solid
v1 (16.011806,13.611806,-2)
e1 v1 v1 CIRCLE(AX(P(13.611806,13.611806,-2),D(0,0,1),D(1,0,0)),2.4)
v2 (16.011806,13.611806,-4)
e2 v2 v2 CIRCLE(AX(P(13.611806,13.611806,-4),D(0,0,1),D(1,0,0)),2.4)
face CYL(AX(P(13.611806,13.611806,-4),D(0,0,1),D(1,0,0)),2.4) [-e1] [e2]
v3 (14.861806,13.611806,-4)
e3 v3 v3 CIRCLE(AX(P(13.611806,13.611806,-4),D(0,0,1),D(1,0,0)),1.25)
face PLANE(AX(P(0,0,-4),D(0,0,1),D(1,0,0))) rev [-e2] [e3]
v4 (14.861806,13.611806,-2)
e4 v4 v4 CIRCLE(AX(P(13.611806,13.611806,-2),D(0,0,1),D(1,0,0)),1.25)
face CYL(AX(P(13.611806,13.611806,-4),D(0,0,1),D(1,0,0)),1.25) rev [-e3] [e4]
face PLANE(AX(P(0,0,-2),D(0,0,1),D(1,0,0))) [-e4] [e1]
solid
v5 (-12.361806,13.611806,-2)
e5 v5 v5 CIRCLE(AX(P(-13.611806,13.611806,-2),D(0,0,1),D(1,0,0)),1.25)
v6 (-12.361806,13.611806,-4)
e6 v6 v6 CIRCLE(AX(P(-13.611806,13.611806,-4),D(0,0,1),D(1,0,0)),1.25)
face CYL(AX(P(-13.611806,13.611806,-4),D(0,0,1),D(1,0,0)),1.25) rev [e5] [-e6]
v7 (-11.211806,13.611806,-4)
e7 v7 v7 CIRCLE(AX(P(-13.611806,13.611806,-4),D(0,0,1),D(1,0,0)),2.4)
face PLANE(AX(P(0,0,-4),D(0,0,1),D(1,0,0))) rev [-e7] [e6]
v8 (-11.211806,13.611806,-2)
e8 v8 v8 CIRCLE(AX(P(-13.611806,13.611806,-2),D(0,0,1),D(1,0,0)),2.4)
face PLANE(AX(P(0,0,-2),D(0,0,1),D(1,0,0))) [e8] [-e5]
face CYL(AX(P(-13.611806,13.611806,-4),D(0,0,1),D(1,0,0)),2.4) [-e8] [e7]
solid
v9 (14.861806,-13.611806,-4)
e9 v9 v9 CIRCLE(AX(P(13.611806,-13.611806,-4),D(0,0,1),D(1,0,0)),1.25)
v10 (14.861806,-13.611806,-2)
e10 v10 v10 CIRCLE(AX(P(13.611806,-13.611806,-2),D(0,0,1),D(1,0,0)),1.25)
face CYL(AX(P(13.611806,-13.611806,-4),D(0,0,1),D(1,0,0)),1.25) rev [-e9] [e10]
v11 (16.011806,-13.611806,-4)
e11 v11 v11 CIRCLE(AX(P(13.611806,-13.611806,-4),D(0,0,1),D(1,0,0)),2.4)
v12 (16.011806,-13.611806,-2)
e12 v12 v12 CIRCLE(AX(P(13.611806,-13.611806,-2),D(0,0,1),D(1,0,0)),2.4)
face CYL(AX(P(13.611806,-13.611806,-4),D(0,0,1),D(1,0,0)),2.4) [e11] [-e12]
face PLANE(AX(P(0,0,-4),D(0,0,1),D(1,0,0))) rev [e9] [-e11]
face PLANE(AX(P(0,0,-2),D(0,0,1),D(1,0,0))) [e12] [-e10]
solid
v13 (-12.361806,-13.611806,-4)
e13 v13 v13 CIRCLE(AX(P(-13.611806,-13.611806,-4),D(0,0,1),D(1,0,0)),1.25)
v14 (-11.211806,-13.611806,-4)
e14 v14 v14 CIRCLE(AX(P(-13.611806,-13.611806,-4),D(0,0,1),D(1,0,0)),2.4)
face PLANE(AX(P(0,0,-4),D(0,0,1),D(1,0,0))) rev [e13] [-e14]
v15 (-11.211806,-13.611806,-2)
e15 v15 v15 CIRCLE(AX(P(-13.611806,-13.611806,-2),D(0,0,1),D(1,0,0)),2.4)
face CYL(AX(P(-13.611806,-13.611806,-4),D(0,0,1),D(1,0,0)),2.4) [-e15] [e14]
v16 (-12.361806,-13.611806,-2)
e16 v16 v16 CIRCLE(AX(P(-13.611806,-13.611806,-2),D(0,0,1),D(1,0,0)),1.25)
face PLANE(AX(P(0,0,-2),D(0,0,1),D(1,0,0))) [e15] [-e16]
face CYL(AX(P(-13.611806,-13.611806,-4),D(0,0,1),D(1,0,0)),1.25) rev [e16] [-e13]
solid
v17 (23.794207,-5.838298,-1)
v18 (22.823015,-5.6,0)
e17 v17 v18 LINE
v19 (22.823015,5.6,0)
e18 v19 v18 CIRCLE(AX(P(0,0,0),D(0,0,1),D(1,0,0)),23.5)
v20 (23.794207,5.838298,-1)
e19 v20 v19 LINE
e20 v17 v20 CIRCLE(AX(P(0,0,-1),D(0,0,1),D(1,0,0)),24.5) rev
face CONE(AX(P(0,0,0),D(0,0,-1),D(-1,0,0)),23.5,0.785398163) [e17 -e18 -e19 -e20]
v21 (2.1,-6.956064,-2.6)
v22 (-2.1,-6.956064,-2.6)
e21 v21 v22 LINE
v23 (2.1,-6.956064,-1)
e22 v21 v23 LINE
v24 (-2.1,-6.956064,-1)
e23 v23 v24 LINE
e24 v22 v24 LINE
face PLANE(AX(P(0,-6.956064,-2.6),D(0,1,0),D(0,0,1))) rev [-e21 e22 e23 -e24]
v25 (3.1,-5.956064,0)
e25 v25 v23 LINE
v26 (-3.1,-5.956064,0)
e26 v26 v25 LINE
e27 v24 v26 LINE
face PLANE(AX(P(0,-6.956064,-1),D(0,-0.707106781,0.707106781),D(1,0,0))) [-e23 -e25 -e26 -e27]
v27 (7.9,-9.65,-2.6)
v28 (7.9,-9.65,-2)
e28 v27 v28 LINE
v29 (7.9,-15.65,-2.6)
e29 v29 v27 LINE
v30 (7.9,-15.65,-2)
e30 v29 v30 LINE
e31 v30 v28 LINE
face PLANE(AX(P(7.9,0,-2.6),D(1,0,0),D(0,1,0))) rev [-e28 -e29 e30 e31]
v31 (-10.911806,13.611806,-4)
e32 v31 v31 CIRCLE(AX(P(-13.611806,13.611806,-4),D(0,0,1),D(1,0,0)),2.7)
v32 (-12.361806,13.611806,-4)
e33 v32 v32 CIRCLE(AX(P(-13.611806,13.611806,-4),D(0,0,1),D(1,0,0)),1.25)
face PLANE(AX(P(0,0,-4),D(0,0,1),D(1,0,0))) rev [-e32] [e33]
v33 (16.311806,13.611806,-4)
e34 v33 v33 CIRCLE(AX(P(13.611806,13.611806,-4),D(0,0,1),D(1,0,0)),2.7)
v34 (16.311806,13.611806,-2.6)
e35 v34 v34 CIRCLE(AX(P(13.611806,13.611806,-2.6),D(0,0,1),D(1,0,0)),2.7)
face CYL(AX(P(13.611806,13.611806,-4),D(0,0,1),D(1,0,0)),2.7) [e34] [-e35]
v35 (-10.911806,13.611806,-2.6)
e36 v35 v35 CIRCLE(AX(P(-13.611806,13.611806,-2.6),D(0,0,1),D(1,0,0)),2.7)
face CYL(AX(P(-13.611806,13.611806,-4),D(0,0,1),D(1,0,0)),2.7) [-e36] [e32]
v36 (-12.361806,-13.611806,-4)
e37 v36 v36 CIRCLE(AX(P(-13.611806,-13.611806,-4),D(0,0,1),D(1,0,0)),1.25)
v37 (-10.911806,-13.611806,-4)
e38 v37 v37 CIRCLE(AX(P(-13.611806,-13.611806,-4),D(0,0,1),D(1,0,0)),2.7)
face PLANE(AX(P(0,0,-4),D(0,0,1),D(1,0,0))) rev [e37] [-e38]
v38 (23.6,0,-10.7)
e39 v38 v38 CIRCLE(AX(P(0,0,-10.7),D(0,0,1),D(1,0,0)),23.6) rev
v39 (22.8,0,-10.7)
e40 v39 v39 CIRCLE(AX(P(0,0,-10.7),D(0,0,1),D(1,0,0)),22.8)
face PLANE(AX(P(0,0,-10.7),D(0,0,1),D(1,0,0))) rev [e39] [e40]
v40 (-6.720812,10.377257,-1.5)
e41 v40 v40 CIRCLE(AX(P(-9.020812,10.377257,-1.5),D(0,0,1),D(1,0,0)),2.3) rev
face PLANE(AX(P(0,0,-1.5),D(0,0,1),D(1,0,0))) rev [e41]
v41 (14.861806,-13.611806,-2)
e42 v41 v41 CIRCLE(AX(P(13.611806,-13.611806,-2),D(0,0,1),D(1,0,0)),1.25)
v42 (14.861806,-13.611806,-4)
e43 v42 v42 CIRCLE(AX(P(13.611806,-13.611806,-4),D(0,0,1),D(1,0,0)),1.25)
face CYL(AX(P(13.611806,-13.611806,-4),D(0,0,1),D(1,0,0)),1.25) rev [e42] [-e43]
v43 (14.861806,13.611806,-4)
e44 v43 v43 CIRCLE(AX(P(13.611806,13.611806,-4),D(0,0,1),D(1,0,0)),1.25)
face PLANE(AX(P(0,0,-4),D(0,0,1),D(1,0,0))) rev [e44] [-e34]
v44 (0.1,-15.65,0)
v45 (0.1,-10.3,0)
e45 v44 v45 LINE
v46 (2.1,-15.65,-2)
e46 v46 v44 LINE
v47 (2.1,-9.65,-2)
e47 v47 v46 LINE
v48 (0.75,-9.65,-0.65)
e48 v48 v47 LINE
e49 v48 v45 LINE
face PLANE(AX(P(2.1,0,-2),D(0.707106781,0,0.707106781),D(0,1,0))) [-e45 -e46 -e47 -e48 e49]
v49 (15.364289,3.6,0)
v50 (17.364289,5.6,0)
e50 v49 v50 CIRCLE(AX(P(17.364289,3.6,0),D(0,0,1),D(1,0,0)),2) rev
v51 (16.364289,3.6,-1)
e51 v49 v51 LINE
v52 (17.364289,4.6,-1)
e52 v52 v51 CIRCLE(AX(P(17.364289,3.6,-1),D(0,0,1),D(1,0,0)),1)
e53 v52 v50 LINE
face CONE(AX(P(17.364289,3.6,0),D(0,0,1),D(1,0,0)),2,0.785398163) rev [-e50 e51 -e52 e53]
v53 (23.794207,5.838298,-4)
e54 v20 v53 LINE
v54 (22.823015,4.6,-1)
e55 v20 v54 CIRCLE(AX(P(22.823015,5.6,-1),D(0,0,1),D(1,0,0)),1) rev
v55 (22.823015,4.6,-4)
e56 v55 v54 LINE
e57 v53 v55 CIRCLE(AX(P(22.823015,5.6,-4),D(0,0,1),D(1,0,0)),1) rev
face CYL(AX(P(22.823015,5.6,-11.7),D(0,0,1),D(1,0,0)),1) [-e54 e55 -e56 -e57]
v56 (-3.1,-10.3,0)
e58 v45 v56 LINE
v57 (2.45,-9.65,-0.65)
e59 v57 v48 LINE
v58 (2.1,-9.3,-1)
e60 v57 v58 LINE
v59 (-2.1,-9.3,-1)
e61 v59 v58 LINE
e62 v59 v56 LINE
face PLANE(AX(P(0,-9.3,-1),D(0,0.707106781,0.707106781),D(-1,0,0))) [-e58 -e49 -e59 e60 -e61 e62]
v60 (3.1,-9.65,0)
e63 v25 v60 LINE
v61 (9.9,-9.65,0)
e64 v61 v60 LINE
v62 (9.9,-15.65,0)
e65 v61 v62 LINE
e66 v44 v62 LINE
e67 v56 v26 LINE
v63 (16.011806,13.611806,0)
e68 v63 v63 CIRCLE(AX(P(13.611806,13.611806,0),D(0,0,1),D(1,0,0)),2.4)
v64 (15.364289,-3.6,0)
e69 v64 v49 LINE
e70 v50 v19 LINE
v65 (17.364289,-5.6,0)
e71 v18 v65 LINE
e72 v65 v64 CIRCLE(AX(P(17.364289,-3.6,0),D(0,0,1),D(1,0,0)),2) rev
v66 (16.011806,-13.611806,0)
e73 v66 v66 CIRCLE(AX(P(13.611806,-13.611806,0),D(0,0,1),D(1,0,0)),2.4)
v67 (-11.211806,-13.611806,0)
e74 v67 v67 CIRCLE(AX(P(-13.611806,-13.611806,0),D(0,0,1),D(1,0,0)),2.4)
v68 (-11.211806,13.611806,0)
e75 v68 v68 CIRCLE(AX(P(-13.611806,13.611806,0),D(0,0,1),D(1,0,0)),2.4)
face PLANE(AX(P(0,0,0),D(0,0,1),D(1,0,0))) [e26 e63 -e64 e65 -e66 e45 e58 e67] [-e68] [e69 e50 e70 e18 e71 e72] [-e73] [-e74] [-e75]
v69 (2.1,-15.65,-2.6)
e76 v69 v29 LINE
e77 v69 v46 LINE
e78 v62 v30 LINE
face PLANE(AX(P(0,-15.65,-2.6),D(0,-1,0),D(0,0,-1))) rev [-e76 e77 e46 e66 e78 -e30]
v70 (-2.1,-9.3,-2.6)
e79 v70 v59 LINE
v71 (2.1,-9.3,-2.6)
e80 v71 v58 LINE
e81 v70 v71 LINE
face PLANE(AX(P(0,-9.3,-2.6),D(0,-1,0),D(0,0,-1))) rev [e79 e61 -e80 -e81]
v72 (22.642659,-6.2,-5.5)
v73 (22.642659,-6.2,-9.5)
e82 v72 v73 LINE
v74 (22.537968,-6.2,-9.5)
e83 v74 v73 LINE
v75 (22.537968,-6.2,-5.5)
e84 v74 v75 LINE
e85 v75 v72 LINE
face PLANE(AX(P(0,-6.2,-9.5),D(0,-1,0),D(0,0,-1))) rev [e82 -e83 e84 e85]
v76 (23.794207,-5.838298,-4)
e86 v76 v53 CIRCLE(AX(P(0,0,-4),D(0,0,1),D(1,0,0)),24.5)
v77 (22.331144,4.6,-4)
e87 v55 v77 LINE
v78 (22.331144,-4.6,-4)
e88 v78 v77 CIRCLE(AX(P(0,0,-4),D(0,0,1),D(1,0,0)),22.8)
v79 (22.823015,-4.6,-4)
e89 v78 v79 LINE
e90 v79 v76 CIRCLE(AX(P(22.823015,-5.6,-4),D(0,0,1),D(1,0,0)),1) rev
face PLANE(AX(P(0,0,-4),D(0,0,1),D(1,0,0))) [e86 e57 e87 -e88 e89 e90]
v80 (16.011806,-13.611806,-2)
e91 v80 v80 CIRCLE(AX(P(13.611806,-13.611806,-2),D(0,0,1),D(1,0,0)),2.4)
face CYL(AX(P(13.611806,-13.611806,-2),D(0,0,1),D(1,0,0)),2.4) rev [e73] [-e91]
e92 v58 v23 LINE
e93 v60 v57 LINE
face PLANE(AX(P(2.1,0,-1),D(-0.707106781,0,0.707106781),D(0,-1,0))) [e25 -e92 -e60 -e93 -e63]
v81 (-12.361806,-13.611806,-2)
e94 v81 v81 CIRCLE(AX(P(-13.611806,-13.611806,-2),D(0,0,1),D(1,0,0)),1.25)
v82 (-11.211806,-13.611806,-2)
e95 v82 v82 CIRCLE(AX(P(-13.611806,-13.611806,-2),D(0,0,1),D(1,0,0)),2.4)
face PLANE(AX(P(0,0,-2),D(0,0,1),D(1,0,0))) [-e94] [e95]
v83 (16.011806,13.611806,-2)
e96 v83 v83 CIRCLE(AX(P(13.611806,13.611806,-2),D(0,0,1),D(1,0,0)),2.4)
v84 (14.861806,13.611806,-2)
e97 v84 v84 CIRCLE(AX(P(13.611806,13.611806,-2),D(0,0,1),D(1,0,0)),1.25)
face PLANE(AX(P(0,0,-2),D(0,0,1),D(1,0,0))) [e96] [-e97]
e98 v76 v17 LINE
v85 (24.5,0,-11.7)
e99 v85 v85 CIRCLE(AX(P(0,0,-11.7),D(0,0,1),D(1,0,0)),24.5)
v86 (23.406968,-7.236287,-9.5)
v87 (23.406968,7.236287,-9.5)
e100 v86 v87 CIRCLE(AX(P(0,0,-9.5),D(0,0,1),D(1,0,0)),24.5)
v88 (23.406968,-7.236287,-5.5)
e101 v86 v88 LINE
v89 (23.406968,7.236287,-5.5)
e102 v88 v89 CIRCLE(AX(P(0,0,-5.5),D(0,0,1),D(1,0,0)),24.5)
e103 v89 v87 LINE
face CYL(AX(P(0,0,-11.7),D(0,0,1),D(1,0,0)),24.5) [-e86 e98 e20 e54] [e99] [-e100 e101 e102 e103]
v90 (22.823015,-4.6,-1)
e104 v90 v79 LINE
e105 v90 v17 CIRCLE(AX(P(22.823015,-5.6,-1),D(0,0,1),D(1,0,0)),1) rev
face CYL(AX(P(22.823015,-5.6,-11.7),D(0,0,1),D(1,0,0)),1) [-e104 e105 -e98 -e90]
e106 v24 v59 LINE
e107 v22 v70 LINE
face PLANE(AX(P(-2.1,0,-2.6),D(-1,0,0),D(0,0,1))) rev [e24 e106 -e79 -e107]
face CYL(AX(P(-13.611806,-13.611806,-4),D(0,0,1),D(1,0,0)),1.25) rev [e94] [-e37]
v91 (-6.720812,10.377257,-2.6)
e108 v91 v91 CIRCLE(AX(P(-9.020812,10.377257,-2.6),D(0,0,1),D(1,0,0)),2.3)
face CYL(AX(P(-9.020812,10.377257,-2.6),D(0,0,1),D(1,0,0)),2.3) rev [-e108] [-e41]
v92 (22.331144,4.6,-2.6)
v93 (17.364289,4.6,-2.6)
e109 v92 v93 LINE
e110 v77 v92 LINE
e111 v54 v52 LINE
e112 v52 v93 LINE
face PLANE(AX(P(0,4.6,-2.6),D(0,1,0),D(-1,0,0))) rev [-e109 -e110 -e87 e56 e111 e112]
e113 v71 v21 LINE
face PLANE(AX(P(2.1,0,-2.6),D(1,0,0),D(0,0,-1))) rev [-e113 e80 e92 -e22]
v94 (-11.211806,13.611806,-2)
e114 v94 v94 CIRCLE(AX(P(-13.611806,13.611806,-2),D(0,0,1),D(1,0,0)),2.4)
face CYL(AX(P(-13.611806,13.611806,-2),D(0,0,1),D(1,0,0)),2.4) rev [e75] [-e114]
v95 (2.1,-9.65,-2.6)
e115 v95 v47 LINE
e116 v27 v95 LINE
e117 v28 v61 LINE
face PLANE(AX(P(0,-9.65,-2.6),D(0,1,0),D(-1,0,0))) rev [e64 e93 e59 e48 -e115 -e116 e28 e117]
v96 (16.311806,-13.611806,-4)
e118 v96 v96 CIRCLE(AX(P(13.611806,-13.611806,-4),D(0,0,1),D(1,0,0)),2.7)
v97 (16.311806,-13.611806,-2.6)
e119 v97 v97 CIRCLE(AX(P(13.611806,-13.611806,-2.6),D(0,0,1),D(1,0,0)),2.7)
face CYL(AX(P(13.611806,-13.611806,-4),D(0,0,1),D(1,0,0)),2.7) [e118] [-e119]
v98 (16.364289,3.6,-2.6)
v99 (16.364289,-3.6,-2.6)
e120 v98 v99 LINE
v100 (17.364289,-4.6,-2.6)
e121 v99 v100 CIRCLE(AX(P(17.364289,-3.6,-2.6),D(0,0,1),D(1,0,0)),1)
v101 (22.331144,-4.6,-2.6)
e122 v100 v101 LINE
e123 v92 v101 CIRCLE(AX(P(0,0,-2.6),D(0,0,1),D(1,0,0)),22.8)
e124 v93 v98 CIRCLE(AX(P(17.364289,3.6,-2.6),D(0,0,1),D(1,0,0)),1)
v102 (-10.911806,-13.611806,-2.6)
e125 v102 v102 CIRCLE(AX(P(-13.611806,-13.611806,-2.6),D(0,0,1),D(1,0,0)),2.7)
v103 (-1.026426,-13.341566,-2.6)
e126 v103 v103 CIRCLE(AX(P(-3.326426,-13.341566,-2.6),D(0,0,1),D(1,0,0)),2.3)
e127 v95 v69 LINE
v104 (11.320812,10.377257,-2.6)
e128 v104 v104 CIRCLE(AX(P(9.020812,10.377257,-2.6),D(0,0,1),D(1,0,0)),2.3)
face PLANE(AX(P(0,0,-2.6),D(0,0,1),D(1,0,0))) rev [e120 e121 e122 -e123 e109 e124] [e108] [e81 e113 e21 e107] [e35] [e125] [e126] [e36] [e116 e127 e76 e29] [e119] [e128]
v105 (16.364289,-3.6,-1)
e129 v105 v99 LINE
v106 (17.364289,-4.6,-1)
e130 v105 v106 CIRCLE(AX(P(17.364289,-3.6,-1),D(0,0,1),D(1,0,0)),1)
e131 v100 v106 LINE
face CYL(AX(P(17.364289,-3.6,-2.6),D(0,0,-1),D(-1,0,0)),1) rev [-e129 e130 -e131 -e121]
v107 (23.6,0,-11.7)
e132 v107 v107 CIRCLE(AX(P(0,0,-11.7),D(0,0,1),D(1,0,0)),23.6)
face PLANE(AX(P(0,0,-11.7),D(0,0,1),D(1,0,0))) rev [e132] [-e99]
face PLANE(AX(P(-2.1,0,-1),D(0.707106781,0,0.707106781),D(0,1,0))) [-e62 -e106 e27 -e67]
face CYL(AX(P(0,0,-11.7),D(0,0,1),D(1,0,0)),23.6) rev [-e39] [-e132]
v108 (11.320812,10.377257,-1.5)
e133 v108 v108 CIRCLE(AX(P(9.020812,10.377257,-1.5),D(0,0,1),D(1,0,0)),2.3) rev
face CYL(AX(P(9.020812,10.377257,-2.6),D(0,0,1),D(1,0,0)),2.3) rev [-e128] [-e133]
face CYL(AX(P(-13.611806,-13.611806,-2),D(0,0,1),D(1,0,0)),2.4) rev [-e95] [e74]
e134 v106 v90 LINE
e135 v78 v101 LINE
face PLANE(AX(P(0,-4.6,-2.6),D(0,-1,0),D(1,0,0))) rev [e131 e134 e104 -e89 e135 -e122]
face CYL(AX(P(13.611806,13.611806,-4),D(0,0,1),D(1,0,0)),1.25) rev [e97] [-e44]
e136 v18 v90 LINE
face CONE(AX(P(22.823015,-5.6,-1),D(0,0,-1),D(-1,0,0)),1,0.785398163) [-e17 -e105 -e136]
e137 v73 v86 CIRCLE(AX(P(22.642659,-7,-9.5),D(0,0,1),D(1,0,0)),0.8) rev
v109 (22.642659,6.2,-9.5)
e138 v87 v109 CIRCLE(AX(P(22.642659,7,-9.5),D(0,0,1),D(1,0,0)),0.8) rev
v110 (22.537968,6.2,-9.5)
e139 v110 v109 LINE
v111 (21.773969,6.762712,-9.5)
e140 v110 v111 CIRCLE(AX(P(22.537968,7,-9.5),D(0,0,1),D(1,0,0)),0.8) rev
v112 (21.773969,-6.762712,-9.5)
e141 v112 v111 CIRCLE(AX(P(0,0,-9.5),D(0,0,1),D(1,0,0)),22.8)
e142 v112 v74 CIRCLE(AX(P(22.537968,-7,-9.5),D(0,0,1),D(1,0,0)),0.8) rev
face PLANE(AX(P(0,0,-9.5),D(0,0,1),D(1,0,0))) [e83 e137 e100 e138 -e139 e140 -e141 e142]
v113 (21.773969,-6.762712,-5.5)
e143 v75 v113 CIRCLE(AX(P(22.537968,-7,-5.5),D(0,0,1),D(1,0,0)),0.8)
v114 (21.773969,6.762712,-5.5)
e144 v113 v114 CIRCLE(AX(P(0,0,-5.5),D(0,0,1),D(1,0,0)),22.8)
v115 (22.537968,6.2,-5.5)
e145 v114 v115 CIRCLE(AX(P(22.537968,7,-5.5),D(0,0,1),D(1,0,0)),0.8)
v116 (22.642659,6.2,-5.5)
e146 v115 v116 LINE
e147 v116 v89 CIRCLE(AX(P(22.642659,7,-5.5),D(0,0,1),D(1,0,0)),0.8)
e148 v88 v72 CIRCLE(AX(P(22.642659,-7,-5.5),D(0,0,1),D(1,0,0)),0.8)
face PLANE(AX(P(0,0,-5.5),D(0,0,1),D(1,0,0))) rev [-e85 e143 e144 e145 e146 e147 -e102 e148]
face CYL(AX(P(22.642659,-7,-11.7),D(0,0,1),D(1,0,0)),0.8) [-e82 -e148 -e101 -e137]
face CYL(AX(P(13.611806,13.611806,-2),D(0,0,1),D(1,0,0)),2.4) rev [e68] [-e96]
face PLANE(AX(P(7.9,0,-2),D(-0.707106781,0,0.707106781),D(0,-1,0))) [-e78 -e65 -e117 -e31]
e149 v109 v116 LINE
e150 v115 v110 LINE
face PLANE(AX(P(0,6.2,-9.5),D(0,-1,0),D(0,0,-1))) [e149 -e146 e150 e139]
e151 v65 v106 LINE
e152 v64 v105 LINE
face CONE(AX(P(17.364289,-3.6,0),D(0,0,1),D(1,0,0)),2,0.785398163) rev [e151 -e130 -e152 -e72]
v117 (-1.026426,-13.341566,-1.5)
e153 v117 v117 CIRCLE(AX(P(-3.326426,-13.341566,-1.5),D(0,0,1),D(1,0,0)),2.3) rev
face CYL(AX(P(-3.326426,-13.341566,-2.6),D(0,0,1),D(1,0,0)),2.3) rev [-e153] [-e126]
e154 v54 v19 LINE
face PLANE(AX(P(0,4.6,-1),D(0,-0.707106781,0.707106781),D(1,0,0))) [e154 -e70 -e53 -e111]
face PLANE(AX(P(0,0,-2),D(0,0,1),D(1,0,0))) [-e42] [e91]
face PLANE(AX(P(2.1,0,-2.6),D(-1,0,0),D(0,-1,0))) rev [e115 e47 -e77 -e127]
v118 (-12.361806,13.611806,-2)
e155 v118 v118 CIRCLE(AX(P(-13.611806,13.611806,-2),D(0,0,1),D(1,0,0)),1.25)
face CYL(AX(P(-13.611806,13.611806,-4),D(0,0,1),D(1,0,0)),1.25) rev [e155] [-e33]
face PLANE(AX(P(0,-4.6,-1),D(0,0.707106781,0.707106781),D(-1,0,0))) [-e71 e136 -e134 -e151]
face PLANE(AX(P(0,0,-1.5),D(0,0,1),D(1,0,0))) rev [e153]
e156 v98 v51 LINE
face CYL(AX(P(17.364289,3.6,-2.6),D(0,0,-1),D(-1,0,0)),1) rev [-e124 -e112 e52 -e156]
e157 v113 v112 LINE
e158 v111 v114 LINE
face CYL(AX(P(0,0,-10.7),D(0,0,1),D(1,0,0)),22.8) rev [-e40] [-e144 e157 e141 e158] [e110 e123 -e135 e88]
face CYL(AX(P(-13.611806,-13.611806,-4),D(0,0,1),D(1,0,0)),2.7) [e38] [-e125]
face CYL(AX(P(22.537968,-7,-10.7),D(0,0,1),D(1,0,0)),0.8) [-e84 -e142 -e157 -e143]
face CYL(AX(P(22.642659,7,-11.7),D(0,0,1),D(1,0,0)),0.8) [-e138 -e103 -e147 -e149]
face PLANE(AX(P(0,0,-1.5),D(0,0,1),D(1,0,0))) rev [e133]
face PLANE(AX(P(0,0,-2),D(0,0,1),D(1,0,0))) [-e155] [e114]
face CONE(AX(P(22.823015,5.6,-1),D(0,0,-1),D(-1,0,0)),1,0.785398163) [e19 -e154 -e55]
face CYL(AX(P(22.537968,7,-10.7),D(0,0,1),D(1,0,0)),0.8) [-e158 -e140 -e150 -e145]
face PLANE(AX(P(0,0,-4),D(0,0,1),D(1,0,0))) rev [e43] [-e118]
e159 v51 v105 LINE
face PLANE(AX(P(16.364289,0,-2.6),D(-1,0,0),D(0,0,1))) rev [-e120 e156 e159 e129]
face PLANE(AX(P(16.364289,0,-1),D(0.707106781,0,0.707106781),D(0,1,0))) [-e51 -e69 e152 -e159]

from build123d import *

# Parameters (mm, degrees)
SKETCH_2_R          = 24.5
SKETCH_2_R_2        = 23.6
EXTRUDE_3_DEPTH     = 11.7
SKETCH_2_5_R        = 23.6
SKETCH_2_5_R_2      = 22.8
EXTRUDE_4_DEPTH     = 10.7
SKETCH_2_6_R        = 2.7
SKETCH_2_6_R_2      = 2.3
SKETCH_2_6_W        = 5.8
SKETCH_2_6_H        = 6
SKETCH_2_6_W_2      = 4.2
SKETCH_2_6_H_2      = 2.343935591
EXTRUDE_5_DEPTH     = 2.6
SKETCH_2_7_R        = 2.4
SKETCH_2_7_R_2      = 1.25
EXTRUDE_6_DEPTH     = 4
EXTRUDE_6_2_DEPTH   = 4
EXTRUDE_6_3_DEPTH   = 4
EXTRUDE_6_4_DEPTH   = 4
SKETCH_2_20_R       = 2.3
EXTRUDE_10_DEPTH    = 1.5
SKETCH_2_9_R        = 2.7
SKETCH_2_9_R_2      = 1.25
SKETCH_2_9_R_3      = 2.4
EXTRUDE_7_DEPTH     = 4
CUT_EXTRUDE_2_DEPTH = 9.5
SKETCH_2_18_R       = 2.4
SKETCH_2_18_R_2     = 1.25
CUT_EXTRUDE_3_DEPTH = 2
SKETCH_2_14_R       = 24.5
SKETCH_2_14_R_2     = 22.8
EXTRUDE_9_DEPTH     = 5.5
CUT_EXTRUDE_4_DEPTH = 4
FILLET_2_R          = 0.8
FILLET_3_R          = 0.8
FILLET_4_R          = 0.8
FILLET_5_R          = 0.8
CHAMFER_1_SIZE      = 2
FILLET_6_R          = 1
CHAMFER_5_SIZE      = 1


with BuildPart() as part:
    # 草图2 → 凸台-拉伸3 (new body)
    with BuildSketch(Plane.XY):
        Circle(SKETCH_2_R)
        Circle(SKETCH_2_R_2, mode=Mode.SUBTRACT)
    extrude(amount=-EXTRUDE_3_DEPTH)

    # 草图2<5> → 凸台-拉伸4 (add)
    with BuildSketch(Plane.XY):
        Circle(SKETCH_2_5_R)
        Circle(SKETCH_2_5_R_2, mode=Mode.SUBTRACT)
    extrude(amount=-EXTRUDE_4_DEPTH)

    # 草图2<6> → 凸台-拉伸5 (add)
    with BuildSketch(Plane.XY):
        with BuildLine():
            Line((16.364288895, 4.6), (22.331144171, 4.6))
            ThreePointArc((22.331144171, 4.6), (22.150438226, 5.403525366), (21.940829519, 6.2))
            ThreePointArc((21.940829519, 6.2), (-22.8, 0), (21.940829519, -6.2))
            ThreePointArc((21.940829519, -6.2), (22.150438226, -5.403525366), (22.331144171, -4.6))
            Line((22.331144171, -4.6), (16.364288895, -4.6))
            Line((16.364288895, -4.6), (16.364288895, 4.6))
        make_face()
        with Locations((-13.611805538, -13.611805538)):
            Circle(SKETCH_2_6_R, mode=Mode.SUBTRACT)
        with Locations((-3.326426064, -13.341566236)):
            Circle(SKETCH_2_6_R_2, mode=Mode.SUBTRACT)
        with Locations((5, -12.65)):
            Rectangle(SKETCH_2_6_W, SKETCH_2_6_H, mode=Mode.SUBTRACT)
        with Locations((13.611805538, -13.611805538)):
            Circle(SKETCH_2_6_R, mode=Mode.SUBTRACT)
        with Locations((0, -8.128032205)):
            Rectangle(SKETCH_2_6_W_2, SKETCH_2_6_H_2, mode=Mode.SUBTRACT)
        with Locations((-9.020811649, 10.377256728)):
            Circle(SKETCH_2_6_R_2, mode=Mode.SUBTRACT)
        with Locations((-13.611805538, 13.611805538)):
            Circle(SKETCH_2_6_R, mode=Mode.SUBTRACT)
        with Locations((9.020811649, 10.377256728)):
            Circle(SKETCH_2_6_R_2, mode=Mode.SUBTRACT)
        with Locations((13.611805538, 13.611805538)):
            Circle(SKETCH_2_6_R, mode=Mode.SUBTRACT)
    extrude(amount=-EXTRUDE_5_DEPTH)

    # 草图2<20> → 凸台-拉伸10 (add)
    with BuildSketch(Plane.XY):
        with Locations((-9.020811649, 10.377256728)):
            Circle(SKETCH_2_20_R)
        with Locations((9.020811649, 10.377256728)):
            Circle(SKETCH_2_20_R)
        with Locations((-3.326426064, -13.341566236)):
            Circle(SKETCH_2_20_R)
    extrude(amount=-EXTRUDE_10_DEPTH)

    # 草图2<9> → 凸台-拉伸7 (add)
    # profile 1 of 8: a face of its own
    with BuildSketch(Plane.XY):
        with Locations((-13.611805538, 13.611805538)):
            Circle(SKETCH_2_9_R)
        with Locations((-13.611805538, 13.611805538)):
            Circle(SKETCH_2_9_R_2, mode=Mode.SUBTRACT)
    # profile 2 of 8: a face of its own
    with BuildSketch(Plane.XY):
        with Locations((13.611805538, 13.611805538)):
            Circle(SKETCH_2_9_R)
        with Locations((13.611805538, 13.611805538)):
            Circle(SKETCH_2_9_R_2, mode=Mode.SUBTRACT)
    # profile 3 of 8: a face of its own
    with BuildSketch(Plane.XY):
        with Locations((-13.611805538, 13.611805538)):
            Circle(SKETCH_2_9_R)
        with Locations((-13.611805538, 13.611805538)):
            Circle(SKETCH_2_9_R_3, mode=Mode.SUBTRACT)
    # profile 4 of 8: a face of its own
    with BuildSketch(Plane.XY):
        with Locations((13.611805538, 13.611805538)):
            Circle(SKETCH_2_9_R)
        with Locations((13.611805538, 13.611805538)):
            Circle(SKETCH_2_9_R_3, mode=Mode.SUBTRACT)
    # profile 5 of 8: a face of its own
    with BuildSketch(Plane.XY):
        with Locations((13.611805538, -13.611805538)):
            Circle(SKETCH_2_9_R)
        with Locations((13.611805538, -13.611805538)):
            Circle(SKETCH_2_9_R_3, mode=Mode.SUBTRACT)
    # profile 6 of 8: a face of its own
    with BuildSketch(Plane.XY):
        with Locations((-13.611805538, -13.611805538)):
            Circle(SKETCH_2_9_R)
        with Locations((-13.611805538, -13.611805538)):
            Circle(SKETCH_2_9_R_3, mode=Mode.SUBTRACT)
    # profile 7 of 8: a face of its own
    with BuildSketch(Plane.XY):
        with Locations((-13.611805538, -13.611805538)):
            Circle(SKETCH_2_9_R_3)
        with Locations((-13.611805538, -13.611805538)):
            Circle(SKETCH_2_9_R_2, mode=Mode.SUBTRACT)
    # profile 8 of 8: a face of its own
    with BuildSketch(Plane.XY):
        with Locations((13.611805538, -13.611805538)):
            Circle(SKETCH_2_9_R_3)
        with Locations((13.611805538, -13.611805538)):
            Circle(SKETCH_2_9_R_2, mode=Mode.SUBTRACT)
    extrude(amount=-EXTRUDE_7_DEPTH)

    # 草图2<13> → 切除-拉伸2 (cut)
    with BuildSketch(Plane.XY):
        with BuildLine():
            Line((23.70253151, 6.2), (21.940829519, 6.2))
            ThreePointArc((21.940829519, 6.2), (22.8, 0), (21.940829519, -6.2))
            Line((21.940829519, -6.2), (23.70253151, -6.2))
            ThreePointArc((23.70253151, -6.2), (24.5, 0), (23.70253151, 6.2))
        make_face()
    extrude(amount=-CUT_EXTRUDE_2_DEPTH, mode=Mode.SUBTRACT)


with BuildPart() as body_2:
    # 草图2<7> → 凸台-拉伸6 (new body)
    with BuildSketch(Plane.XY):
        with Locations((13.611805538, 13.611805538)):
            Circle(SKETCH_2_7_R)
        with Locations((13.611805538, 13.611805538)):
            Circle(SKETCH_2_7_R_2, mode=Mode.SUBTRACT)
    extrude(amount=-EXTRUDE_6_DEPTH)


with BuildPart() as body_3:
    # 草图2<7> → Extrude 6 2 (new body)
    with BuildSketch(Plane.XY):
        with Locations((-13.611805538, 13.611805538)):
            Circle(SKETCH_2_7_R)
        with Locations((-13.611805538, 13.611805538)):
            Circle(SKETCH_2_7_R_2, mode=Mode.SUBTRACT)
    extrude(amount=-EXTRUDE_6_2_DEPTH)


with BuildPart() as body_4:
    # 草图2<7> → Extrude 6 3 (new body)
    with BuildSketch(Plane.XY):
        with Locations((13.611805538, -13.611805538)):
            Circle(SKETCH_2_7_R)
        with Locations((13.611805538, -13.611805538)):
            Circle(SKETCH_2_7_R_2, mode=Mode.SUBTRACT)
    extrude(amount=-EXTRUDE_6_3_DEPTH)


with BuildPart() as body_5:
    # 草图2<7> → Extrude 6 4 (new body)
    with BuildSketch(Plane.XY):
        with Locations((-13.611805538, -13.611805538)):
            Circle(SKETCH_2_7_R)
        with Locations((-13.611805538, -13.611805538)):
            Circle(SKETCH_2_7_R_2, mode=Mode.SUBTRACT)
    extrude(amount=-EXTRUDE_6_4_DEPTH)


with BuildPart() as cut_extrude_3_tool:
    # 草图2<18> → 切除-拉伸3 (new body)
    # profile 1 of 4: a face of its own
    with BuildSketch(Plane.XY):
        with Locations((13.611805538, 13.611805538)):
            Circle(SKETCH_2_18_R)
        with Locations((13.611805538, 13.611805538)):
            Circle(SKETCH_2_18_R_2, mode=Mode.SUBTRACT)
    # profile 2 of 4: a face of its own
    with BuildSketch(Plane.XY):
        with Locations((13.611805538, -13.611805538)):
            Circle(SKETCH_2_18_R)
        with Locations((13.611805538, -13.611805538)):
            Circle(SKETCH_2_18_R_2, mode=Mode.SUBTRACT)
    # profile 3 of 4: a face of its own
    with BuildSketch(Plane.XY):
        with Locations((-13.611805538, -13.611805538)):
            Circle(SKETCH_2_18_R)
        with Locations((-13.611805538, -13.611805538)):
            Circle(SKETCH_2_18_R_2, mode=Mode.SUBTRACT)
    # profile 4 of 4: a face of its own
    with BuildSketch(Plane.XY):
        with Locations((-13.611805538, 13.611805538)):
            Circle(SKETCH_2_18_R)
        with Locations((-13.611805538, 13.611805538)):
            Circle(SKETCH_2_18_R_2, mode=Mode.SUBTRACT)
    extrude(amount=-CUT_EXTRUDE_3_DEPTH)


with BuildPart() as part_1:
    add(part.part)

    # 切除-拉伸3: cut by cut_extrude_3_tool
    add(cut_extrude_3_tool.part, mode=Mode.SUBTRACT)

    # 草图2<14> → 凸台-拉伸9 (add)
    with BuildSketch(Plane.XY):
        Circle(SKETCH_2_14_R)
        Circle(SKETCH_2_14_R_2, mode=Mode.SUBTRACT)
    extrude(amount=-EXTRUDE_9_DEPTH)

    # 草图2<19> → 切除-拉伸4 (cut)
    with BuildSketch(Plane.XY):
        with BuildLine():
            ThreePointArc((23.6, 0), (23.486565903, 2.311108411), (23.14735406, 4.6))
            Line((23.14735406, 4.6), (22.331144171, 4.6))
            ThreePointArc((22.331144171, 4.6), (22.682483188, 2.311916185), (22.8, 0))
            ThreePointArc((22.8, 0), (22.682483188, -2.311916185), (22.331144171, -4.6))
            Line((22.331144171, -4.6), (23.14735406, -4.6))
            ThreePointArc((23.14735406, -4.6), (23.486565903, -2.311108411), (23.6, 0))
        make_face()
        with BuildLine():
            ThreePointArc((24.5, 0), (24.390828993, 2.310294579), (24.064288895, 4.6))
            Line((24.064288895, 4.6), (23.14735406, 4.6))
            ThreePointArc((23.14735406, 4.6), (23.486565903, 2.311108411), (23.6, 0))
            ThreePointArc((23.6, 0), (23.486565903, -2.311108411), (23.14735406, -4.6))
            Line((23.14735406, -4.6), (24.064288895, -4.6))
            ThreePointArc((24.064288895, -4.6), (24.390828993, -2.310294579), (24.5, 0))
        make_face()
    extrude(amount=-CUT_EXTRUDE_4_DEPTH, mode=Mode.SUBTRACT)

    # 圆角2
    fillet_2_edges = [part_1.edges().sort_by_distance(p)[0] for p in [
        (23.70253151, 6.2, -7.5),
    ]]
    fillet(fillet_2_edges, radius=FILLET_2_R)

    # 圆角3
    fillet_3_edges = [part_1.edges().sort_by_distance(p)[0] for p in [
        (23.70253151, -6.2, -7.5),
    ]]
    fillet(fillet_3_edges, radius=FILLET_3_R)

    # 圆角4
    fillet_4_edges = [part_1.edges().sort_by_distance(p)[0] for p in [
        (21.940829519, -6.2, -7.5),
    ]]
    fillet(fillet_4_edges, radius=FILLET_4_R)

    # 圆角5
    fillet_5_edges = [part_1.edges().sort_by_distance(p)[0] for p in [
        (21.940829519, 6.2, -7.5),
    ]]
    fillet(fillet_5_edges, radius=FILLET_5_R)

    # 倒角1
    chamfer_1_edges = [part_1.edges().sort_by_distance(p)[0] for p in [
        (2.1, -12.65, 0),
        (7.9, -12.65, 0),
    ]]
    chamfer(chamfer_1_edges, length=CHAMFER_1_SIZE)

    # 倒角4
    # the kernel refuses this chamfer: 1 mm, written as the material it takes off along each edge
    with BuildSketch(Plane(origin=(-2.1, -6.956064409, 0), x_dir=(0, 0.9996219169112968, 0.027495876610586365), z_dir=(1, 0, 0)), Plane(origin=(2.1, -9.3, 0), x_dir=(0, -0.9996219169112968, 0.02749587661058639), z_dir=(-1, 0, 0))) as chamfer_4_piece_1:
        with BuildLine():
            Line((1.028673195, 0), (-0.056547155, -1.027117794))
            Line((-0.056547155, -1.027117794), (-0.076539593, -1.026567876))
            ThreePointArc((-0.076539593, -1.026567876), (-0.034129227, -0.51339783), (-0.019992438, 0.000549918))
            Line((-0.019992438, 0.000549918), (0.000549918, 0.019992438))
            ThreePointArc((0.000549918, 0.019992438), (0.514497665, 0.00585565), (1.029223113, 0.019992438))
            Line((1.029223113, 0.019992438), (1.028673195, 0))
        make_face()
    extrude(amount=4.2, mode=Mode.SUBTRACT)
    with BuildSketch(Plane(origin=(-2.1, -9.3, 0), x_dir=(-0.9996219169112968, 0, 0.027495876610586365), z_dir=(0, 1, 0)), Plane(origin=(2.1, -6.956064409, 0), x_dir=(0.9996219169112968, 0, 0.027495876610586365), z_dir=(0, -1, 0))) as chamfer_4_piece_2:
        with BuildLine():
            Line((1.028673195, 0), (-0.056547155, -1.027117794))
            Line((-0.056547155, -1.027117794), (-0.076539593, -1.026567876))
            ThreePointArc((-0.076539593, -1.026567876), (-0.034129227, -0.51339783), (-0.019992438, 0.000549918))
            Line((-0.019992438, 0.000549918), (0.000549918, 0.019992438))
            ThreePointArc((0.000549918, 0.019992438), (0.514497665, 0.00585565), (1.029223113, 0.019992438))
            Line((1.029223113, 0.019992438), (1.028673195, 0))
        make_face()
    extrude(amount=2.343935591, mode=Mode.SUBTRACT)
    with BuildSketch(Plane(origin=(-2.1, -9.3, 0), x_dir=(-0.9996219169112968, 0, 0.027495876610586365), z_dir=(0, 1, 0))) as chamfer_4_piece_3a_section:
        with BuildLine():
            Line((1.028673195, 0), (-0.056547155, -1.027117794))
            Line((-0.056547155, -1.027117794), (-0.076539593, -1.026567876))
            ThreePointArc((-0.076539593, -1.026567876), (-0.034129227, -0.51339783), (-0.019992438, 0.000549918))
            Line((-0.019992438, 0.000549918), (0.000549918, 0.019992438))
            ThreePointArc((0.000549918, 0.019992438), (0.514497665, 0.00585565), (1.029223113, 0.019992438))
            Line((1.029223113, 0.019992438), (1.028673195, 0))
        make_face()
    chamfer_4_piece_3a = extrude(amount=4.915618579, mode=Mode.PRIVATE)
    chamfer_4_piece_3a = split(chamfer_4_piece_3a, bisect_by=Plane(origin=(-2.429793627, -6.956064409, -0.329793627), z_dir=(0, 1, 0)), keep=Keep.TOP, mode=Mode.PRIVATE)
    with BuildSketch(Plane(origin=(-4.671682988, -6.956064409, 0), x_dir=(0, 0.9996219169112968, 0.027495876610586365), z_dir=(1, 0, 0))) as chamfer_4_piece_3b_section:
        with BuildLine():
            Line((1.028673195, 0), (-0.056547155, -1.027117794))
            Line((-0.056547155, -1.027117794), (-0.076539593, -1.026567876))
            ThreePointArc((-0.076539593, -1.026567876), (-0.034129227, -0.51339783), (-0.019992438, 0.000549918))
            Line((-0.019992438, 0.000549918), (0.000549918, 0.019992438))
            ThreePointArc((0.000549918, 0.019992438), (0.514497665, 0.00585565), (1.029223113, 0.019992438))
            Line((1.029223113, 0.019992438), (1.028673195, 0))
        make_face()
    chamfer_4_piece_3b = extrude(amount=6.771682988, mode=Mode.PRIVATE)
    chamfer_4_piece_3b = split(chamfer_4_piece_3b, bisect_by=Plane(origin=(-2.1, -6.626270782, -0.329793627), z_dir=(-1, 0, 0)), keep=Keep.TOP, mode=Mode.PRIVATE)
    chamfer_4_piece_3 = chamfer_4_piece_3a & chamfer_4_piece_3b
    add(chamfer_4_piece_3, mode=Mode.SUBTRACT)
    with BuildSketch(Plane(origin=(-2.1, -6.956064409, 0), x_dir=(0, 0.9996219169112968, 0.027495876610586365), z_dir=(1, 0, 0))) as chamfer_4_piece_4a_section:
        with BuildLine():
            Line((1.028673195, 0), (-0.056547155, -1.027117794))
            Line((-0.056547155, -1.027117794), (-0.076539593, -1.026567876))
            ThreePointArc((-0.076539593, -1.026567876), (-0.034129227, -0.51339783), (-0.019992438, 0.000549918))
            Line((-0.019992438, 0.000549918), (0.000549918, 0.019992438))
            ThreePointArc((0.000549918, 0.019992438), (0.514497665, 0.00585565), (1.029223113, 0.019992438))
            Line((1.029223113, 0.019992438), (1.028673195, 0))
        make_face()
    chamfer_4_piece_4a = extrude(amount=6.771682988, mode=Mode.PRIVATE)
    chamfer_4_piece_4a = split(chamfer_4_piece_4a, bisect_by=Plane(origin=(2.1, -6.626270782, -0.329793627), z_dir=(1, 0, 0)), keep=Keep.TOP, mode=Mode.PRIVATE)
    with BuildSketch(Plane(origin=(2.1, -4.384381421, 0), x_dir=(0.9996219169112968, 0, 0.027495876610586365), z_dir=(0, -1, 0))) as chamfer_4_piece_4b_section:
        with BuildLine():
            Line((1.028673195, 0), (-0.056547155, -1.027117794))
            Line((-0.056547155, -1.027117794), (-0.076539593, -1.026567876))
            ThreePointArc((-0.076539593, -1.026567876), (-0.034129227, -0.51339783), (-0.019992438, 0.000549918))
            Line((-0.019992438, 0.000549918), (0.000549918, 0.019992438))
            ThreePointArc((0.000549918, 0.019992438), (0.514497665, 0.00585565), (1.029223113, 0.019992438))
            Line((1.029223113, 0.019992438), (1.028673195, 0))
        make_face()
    chamfer_4_piece_4b = extrude(amount=4.915618579, mode=Mode.PRIVATE)
    chamfer_4_piece_4b = split(chamfer_4_piece_4b, bisect_by=Plane(origin=(2.429793627, -6.956064409, -0.329793627), z_dir=(0, 1, 0)), keep=Keep.TOP, mode=Mode.PRIVATE)
    chamfer_4_piece_4 = chamfer_4_piece_4a & chamfer_4_piece_4b
    add(chamfer_4_piece_4, mode=Mode.SUBTRACT)
    with BuildSketch(Plane(origin=(-2.1, -11.871682988, 0), x_dir=(-0.9996219169112968, 0, 0.027495876610586365), z_dir=(0, 1, 0))) as chamfer_4_piece_5a_section:
        with BuildLine():
            Line((1.028673195, 0), (-0.056547155, -1.027117794))
            Line((-0.056547155, -1.027117794), (-0.076539593, -1.026567876))
            ThreePointArc((-0.076539593, -1.026567876), (-0.034129227, -0.51339783), (-0.019992438, 0.000549918))
            Line((-0.019992438, 0.000549918), (0.000549918, 0.019992438))
            ThreePointArc((0.000549918, 0.019992438), (0.514497665, 0.00585565), (1.029223113, 0.019992438))
            Line((1.029223113, 0.019992438), (1.028673195, 0))
        make_face()
    chamfer_4_piece_5a = extrude(amount=4.915618579, mode=Mode.PRIVATE)
    chamfer_4_piece_5a = split(chamfer_4_piece_5a, bisect_by=Plane(origin=(-2.429793627, -9.3, -0.329793627), z_dir=(0, -1, 0)), keep=Keep.TOP, mode=Mode.PRIVATE)
    with BuildSketch(Plane(origin=(2.1, -9.3, 0), x_dir=(0, -0.9996219169112968, 0.02749587661058639), z_dir=(-1, 0, 0))) as chamfer_4_piece_5b_section:
        with BuildLine():
            Line((1.028673195, 0), (-0.056547155, -1.027117794))
            Line((-0.056547155, -1.027117794), (-0.076539593, -1.026567876))
            ThreePointArc((-0.076539593, -1.026567876), (-0.034129227, -0.51339783), (-0.019992438, 0.000549918))
            Line((-0.019992438, 0.000549918), (0.000549918, 0.019992438))
            ThreePointArc((0.000549918, 0.019992438), (0.514497665, 0.00585565), (1.029223113, 0.019992438))
            Line((1.029223113, 0.019992438), (1.028673195, 0))
        make_face()
    chamfer_4_piece_5b = extrude(amount=6.771682988, mode=Mode.PRIVATE)
    chamfer_4_piece_5b = split(chamfer_4_piece_5b, bisect_by=Plane(origin=(-2.1, -9.629793627, -0.329793627), z_dir=(-1, 0, 0)), keep=Keep.TOP, mode=Mode.PRIVATE)
    chamfer_4_piece_5 = chamfer_4_piece_5a & chamfer_4_piece_5b
    add(chamfer_4_piece_5, mode=Mode.SUBTRACT)
    with BuildSketch(Plane(origin=(2.1, -6.956064409, 0), x_dir=(0.9996219169112968, 0, 0.027495876610586365), z_dir=(0, -1, 0))) as chamfer_4_piece_6a_section:
        with BuildLine():
            Line((1.028673195, 0), (-0.056547155, -1.027117794))
            Line((-0.056547155, -1.027117794), (-0.076539593, -1.026567876))
            ThreePointArc((-0.076539593, -1.026567876), (-0.034129227, -0.51339783), (-0.019992438, 0.000549918))
            Line((-0.019992438, 0.000549918), (0.000549918, 0.019992438))
            ThreePointArc((0.000549918, 0.019992438), (0.514497665, 0.00585565), (1.029223113, 0.019992438))
            Line((1.029223113, 0.019992438), (1.028673195, 0))
        make_face()
    chamfer_4_piece_6a = extrude(amount=4.915618579, mode=Mode.PRIVATE)
    chamfer_4_piece_6a = split(chamfer_4_piece_6a, bisect_by=Plane(origin=(2.429793627, -9.3, -0.329793627), z_dir=(0, -1, 0)), keep=Keep.TOP, mode=Mode.PRIVATE)
    with BuildSketch(Plane(origin=(4.671682988, -9.3, 0), x_dir=(0, -0.9996219169112968, 0.02749587661058639), z_dir=(-1, 0, 0))) as chamfer_4_piece_6b_section:
        with BuildLine():
            Line((1.028673195, 0), (-0.056547155, -1.027117794))
            Line((-0.056547155, -1.027117794), (-0.076539593, -1.026567876))
            ThreePointArc((-0.076539593, -1.026567876), (-0.034129227, -0.51339783), (-0.019992438, 0.000549918))
            Line((-0.019992438, 0.000549918), (0.000549918, 0.019992438))
            ThreePointArc((0.000549918, 0.019992438), (0.514497665, 0.00585565), (1.029223113, 0.019992438))
            Line((1.029223113, 0.019992438), (1.028673195, 0))
        make_face()
    chamfer_4_piece_6b = extrude(amount=6.771682988, mode=Mode.PRIVATE)
    chamfer_4_piece_6b = split(chamfer_4_piece_6b, bisect_by=Plane(origin=(2.1, -9.629793627, -0.329793627), z_dir=(1, 0, 0)), keep=Keep.TOP, mode=Mode.PRIVATE)
    chamfer_4_piece_6 = chamfer_4_piece_6a & chamfer_4_piece_6b
    add(chamfer_4_piece_6, mode=Mode.SUBTRACT)

    # 圆角6
    fillet_6_edges = [part_1.edges().sort_by_distance(p)[0] for p in [
        (24.064288895, 4.6, -2),
        (24.064288895, -4.6, -2),
        (16.364288895, 4.6, -1.3),
        (16.364288895, -4.6, -1.3),
    ]]
    fillet(fillet_6_edges, radius=FILLET_6_R)

    # 倒角5
    chamfer_5_edges = [part_1.edges().sort_by_distance(p)[0] for p in [
        (20.093651797, 4.6, 0),
        (-24.5, 0, 0),
        (20.093651797, -4.6, 0),
        (16.364288895, 0, 0),
        (23.609874876, -4.982868682, 0),
        (23.609874876, 4.982868682, 0),
        (16.657182113, 4.307106781, 0),
        (16.657182113, -4.307106781, 0),
    ]]
    chamfer(chamfer_5_edges, length=CHAMFER_5_SIZE)


with BuildPart() as body_2_1:
    add(body_2.part)

    # 切除-拉伸3: cut by cut_extrude_3_tool
    add(cut_extrude_3_tool.part, mode=Mode.SUBTRACT)


with BuildPart() as body_3_1:
    add(body_3.part)

    # 切除-拉伸3: cut by cut_extrude_3_tool
    add(cut_extrude_3_tool.part, mode=Mode.SUBTRACT)


with BuildPart() as body_4_1:
    add(body_4.part)

    # 切除-拉伸3: cut by cut_extrude_3_tool
    add(cut_extrude_3_tool.part, mode=Mode.SUBTRACT)


with BuildPart() as body_5_1:
    add(body_5.part)

    # 切除-拉伸3: cut by cut_extrude_3_tool
    add(cut_extrude_3_tool.part, mode=Mode.SUBTRACT)


solid = Compound([part_1.part, body_2_1.part, body_3_1.part, body_4_1.part, body_5_1.part])
